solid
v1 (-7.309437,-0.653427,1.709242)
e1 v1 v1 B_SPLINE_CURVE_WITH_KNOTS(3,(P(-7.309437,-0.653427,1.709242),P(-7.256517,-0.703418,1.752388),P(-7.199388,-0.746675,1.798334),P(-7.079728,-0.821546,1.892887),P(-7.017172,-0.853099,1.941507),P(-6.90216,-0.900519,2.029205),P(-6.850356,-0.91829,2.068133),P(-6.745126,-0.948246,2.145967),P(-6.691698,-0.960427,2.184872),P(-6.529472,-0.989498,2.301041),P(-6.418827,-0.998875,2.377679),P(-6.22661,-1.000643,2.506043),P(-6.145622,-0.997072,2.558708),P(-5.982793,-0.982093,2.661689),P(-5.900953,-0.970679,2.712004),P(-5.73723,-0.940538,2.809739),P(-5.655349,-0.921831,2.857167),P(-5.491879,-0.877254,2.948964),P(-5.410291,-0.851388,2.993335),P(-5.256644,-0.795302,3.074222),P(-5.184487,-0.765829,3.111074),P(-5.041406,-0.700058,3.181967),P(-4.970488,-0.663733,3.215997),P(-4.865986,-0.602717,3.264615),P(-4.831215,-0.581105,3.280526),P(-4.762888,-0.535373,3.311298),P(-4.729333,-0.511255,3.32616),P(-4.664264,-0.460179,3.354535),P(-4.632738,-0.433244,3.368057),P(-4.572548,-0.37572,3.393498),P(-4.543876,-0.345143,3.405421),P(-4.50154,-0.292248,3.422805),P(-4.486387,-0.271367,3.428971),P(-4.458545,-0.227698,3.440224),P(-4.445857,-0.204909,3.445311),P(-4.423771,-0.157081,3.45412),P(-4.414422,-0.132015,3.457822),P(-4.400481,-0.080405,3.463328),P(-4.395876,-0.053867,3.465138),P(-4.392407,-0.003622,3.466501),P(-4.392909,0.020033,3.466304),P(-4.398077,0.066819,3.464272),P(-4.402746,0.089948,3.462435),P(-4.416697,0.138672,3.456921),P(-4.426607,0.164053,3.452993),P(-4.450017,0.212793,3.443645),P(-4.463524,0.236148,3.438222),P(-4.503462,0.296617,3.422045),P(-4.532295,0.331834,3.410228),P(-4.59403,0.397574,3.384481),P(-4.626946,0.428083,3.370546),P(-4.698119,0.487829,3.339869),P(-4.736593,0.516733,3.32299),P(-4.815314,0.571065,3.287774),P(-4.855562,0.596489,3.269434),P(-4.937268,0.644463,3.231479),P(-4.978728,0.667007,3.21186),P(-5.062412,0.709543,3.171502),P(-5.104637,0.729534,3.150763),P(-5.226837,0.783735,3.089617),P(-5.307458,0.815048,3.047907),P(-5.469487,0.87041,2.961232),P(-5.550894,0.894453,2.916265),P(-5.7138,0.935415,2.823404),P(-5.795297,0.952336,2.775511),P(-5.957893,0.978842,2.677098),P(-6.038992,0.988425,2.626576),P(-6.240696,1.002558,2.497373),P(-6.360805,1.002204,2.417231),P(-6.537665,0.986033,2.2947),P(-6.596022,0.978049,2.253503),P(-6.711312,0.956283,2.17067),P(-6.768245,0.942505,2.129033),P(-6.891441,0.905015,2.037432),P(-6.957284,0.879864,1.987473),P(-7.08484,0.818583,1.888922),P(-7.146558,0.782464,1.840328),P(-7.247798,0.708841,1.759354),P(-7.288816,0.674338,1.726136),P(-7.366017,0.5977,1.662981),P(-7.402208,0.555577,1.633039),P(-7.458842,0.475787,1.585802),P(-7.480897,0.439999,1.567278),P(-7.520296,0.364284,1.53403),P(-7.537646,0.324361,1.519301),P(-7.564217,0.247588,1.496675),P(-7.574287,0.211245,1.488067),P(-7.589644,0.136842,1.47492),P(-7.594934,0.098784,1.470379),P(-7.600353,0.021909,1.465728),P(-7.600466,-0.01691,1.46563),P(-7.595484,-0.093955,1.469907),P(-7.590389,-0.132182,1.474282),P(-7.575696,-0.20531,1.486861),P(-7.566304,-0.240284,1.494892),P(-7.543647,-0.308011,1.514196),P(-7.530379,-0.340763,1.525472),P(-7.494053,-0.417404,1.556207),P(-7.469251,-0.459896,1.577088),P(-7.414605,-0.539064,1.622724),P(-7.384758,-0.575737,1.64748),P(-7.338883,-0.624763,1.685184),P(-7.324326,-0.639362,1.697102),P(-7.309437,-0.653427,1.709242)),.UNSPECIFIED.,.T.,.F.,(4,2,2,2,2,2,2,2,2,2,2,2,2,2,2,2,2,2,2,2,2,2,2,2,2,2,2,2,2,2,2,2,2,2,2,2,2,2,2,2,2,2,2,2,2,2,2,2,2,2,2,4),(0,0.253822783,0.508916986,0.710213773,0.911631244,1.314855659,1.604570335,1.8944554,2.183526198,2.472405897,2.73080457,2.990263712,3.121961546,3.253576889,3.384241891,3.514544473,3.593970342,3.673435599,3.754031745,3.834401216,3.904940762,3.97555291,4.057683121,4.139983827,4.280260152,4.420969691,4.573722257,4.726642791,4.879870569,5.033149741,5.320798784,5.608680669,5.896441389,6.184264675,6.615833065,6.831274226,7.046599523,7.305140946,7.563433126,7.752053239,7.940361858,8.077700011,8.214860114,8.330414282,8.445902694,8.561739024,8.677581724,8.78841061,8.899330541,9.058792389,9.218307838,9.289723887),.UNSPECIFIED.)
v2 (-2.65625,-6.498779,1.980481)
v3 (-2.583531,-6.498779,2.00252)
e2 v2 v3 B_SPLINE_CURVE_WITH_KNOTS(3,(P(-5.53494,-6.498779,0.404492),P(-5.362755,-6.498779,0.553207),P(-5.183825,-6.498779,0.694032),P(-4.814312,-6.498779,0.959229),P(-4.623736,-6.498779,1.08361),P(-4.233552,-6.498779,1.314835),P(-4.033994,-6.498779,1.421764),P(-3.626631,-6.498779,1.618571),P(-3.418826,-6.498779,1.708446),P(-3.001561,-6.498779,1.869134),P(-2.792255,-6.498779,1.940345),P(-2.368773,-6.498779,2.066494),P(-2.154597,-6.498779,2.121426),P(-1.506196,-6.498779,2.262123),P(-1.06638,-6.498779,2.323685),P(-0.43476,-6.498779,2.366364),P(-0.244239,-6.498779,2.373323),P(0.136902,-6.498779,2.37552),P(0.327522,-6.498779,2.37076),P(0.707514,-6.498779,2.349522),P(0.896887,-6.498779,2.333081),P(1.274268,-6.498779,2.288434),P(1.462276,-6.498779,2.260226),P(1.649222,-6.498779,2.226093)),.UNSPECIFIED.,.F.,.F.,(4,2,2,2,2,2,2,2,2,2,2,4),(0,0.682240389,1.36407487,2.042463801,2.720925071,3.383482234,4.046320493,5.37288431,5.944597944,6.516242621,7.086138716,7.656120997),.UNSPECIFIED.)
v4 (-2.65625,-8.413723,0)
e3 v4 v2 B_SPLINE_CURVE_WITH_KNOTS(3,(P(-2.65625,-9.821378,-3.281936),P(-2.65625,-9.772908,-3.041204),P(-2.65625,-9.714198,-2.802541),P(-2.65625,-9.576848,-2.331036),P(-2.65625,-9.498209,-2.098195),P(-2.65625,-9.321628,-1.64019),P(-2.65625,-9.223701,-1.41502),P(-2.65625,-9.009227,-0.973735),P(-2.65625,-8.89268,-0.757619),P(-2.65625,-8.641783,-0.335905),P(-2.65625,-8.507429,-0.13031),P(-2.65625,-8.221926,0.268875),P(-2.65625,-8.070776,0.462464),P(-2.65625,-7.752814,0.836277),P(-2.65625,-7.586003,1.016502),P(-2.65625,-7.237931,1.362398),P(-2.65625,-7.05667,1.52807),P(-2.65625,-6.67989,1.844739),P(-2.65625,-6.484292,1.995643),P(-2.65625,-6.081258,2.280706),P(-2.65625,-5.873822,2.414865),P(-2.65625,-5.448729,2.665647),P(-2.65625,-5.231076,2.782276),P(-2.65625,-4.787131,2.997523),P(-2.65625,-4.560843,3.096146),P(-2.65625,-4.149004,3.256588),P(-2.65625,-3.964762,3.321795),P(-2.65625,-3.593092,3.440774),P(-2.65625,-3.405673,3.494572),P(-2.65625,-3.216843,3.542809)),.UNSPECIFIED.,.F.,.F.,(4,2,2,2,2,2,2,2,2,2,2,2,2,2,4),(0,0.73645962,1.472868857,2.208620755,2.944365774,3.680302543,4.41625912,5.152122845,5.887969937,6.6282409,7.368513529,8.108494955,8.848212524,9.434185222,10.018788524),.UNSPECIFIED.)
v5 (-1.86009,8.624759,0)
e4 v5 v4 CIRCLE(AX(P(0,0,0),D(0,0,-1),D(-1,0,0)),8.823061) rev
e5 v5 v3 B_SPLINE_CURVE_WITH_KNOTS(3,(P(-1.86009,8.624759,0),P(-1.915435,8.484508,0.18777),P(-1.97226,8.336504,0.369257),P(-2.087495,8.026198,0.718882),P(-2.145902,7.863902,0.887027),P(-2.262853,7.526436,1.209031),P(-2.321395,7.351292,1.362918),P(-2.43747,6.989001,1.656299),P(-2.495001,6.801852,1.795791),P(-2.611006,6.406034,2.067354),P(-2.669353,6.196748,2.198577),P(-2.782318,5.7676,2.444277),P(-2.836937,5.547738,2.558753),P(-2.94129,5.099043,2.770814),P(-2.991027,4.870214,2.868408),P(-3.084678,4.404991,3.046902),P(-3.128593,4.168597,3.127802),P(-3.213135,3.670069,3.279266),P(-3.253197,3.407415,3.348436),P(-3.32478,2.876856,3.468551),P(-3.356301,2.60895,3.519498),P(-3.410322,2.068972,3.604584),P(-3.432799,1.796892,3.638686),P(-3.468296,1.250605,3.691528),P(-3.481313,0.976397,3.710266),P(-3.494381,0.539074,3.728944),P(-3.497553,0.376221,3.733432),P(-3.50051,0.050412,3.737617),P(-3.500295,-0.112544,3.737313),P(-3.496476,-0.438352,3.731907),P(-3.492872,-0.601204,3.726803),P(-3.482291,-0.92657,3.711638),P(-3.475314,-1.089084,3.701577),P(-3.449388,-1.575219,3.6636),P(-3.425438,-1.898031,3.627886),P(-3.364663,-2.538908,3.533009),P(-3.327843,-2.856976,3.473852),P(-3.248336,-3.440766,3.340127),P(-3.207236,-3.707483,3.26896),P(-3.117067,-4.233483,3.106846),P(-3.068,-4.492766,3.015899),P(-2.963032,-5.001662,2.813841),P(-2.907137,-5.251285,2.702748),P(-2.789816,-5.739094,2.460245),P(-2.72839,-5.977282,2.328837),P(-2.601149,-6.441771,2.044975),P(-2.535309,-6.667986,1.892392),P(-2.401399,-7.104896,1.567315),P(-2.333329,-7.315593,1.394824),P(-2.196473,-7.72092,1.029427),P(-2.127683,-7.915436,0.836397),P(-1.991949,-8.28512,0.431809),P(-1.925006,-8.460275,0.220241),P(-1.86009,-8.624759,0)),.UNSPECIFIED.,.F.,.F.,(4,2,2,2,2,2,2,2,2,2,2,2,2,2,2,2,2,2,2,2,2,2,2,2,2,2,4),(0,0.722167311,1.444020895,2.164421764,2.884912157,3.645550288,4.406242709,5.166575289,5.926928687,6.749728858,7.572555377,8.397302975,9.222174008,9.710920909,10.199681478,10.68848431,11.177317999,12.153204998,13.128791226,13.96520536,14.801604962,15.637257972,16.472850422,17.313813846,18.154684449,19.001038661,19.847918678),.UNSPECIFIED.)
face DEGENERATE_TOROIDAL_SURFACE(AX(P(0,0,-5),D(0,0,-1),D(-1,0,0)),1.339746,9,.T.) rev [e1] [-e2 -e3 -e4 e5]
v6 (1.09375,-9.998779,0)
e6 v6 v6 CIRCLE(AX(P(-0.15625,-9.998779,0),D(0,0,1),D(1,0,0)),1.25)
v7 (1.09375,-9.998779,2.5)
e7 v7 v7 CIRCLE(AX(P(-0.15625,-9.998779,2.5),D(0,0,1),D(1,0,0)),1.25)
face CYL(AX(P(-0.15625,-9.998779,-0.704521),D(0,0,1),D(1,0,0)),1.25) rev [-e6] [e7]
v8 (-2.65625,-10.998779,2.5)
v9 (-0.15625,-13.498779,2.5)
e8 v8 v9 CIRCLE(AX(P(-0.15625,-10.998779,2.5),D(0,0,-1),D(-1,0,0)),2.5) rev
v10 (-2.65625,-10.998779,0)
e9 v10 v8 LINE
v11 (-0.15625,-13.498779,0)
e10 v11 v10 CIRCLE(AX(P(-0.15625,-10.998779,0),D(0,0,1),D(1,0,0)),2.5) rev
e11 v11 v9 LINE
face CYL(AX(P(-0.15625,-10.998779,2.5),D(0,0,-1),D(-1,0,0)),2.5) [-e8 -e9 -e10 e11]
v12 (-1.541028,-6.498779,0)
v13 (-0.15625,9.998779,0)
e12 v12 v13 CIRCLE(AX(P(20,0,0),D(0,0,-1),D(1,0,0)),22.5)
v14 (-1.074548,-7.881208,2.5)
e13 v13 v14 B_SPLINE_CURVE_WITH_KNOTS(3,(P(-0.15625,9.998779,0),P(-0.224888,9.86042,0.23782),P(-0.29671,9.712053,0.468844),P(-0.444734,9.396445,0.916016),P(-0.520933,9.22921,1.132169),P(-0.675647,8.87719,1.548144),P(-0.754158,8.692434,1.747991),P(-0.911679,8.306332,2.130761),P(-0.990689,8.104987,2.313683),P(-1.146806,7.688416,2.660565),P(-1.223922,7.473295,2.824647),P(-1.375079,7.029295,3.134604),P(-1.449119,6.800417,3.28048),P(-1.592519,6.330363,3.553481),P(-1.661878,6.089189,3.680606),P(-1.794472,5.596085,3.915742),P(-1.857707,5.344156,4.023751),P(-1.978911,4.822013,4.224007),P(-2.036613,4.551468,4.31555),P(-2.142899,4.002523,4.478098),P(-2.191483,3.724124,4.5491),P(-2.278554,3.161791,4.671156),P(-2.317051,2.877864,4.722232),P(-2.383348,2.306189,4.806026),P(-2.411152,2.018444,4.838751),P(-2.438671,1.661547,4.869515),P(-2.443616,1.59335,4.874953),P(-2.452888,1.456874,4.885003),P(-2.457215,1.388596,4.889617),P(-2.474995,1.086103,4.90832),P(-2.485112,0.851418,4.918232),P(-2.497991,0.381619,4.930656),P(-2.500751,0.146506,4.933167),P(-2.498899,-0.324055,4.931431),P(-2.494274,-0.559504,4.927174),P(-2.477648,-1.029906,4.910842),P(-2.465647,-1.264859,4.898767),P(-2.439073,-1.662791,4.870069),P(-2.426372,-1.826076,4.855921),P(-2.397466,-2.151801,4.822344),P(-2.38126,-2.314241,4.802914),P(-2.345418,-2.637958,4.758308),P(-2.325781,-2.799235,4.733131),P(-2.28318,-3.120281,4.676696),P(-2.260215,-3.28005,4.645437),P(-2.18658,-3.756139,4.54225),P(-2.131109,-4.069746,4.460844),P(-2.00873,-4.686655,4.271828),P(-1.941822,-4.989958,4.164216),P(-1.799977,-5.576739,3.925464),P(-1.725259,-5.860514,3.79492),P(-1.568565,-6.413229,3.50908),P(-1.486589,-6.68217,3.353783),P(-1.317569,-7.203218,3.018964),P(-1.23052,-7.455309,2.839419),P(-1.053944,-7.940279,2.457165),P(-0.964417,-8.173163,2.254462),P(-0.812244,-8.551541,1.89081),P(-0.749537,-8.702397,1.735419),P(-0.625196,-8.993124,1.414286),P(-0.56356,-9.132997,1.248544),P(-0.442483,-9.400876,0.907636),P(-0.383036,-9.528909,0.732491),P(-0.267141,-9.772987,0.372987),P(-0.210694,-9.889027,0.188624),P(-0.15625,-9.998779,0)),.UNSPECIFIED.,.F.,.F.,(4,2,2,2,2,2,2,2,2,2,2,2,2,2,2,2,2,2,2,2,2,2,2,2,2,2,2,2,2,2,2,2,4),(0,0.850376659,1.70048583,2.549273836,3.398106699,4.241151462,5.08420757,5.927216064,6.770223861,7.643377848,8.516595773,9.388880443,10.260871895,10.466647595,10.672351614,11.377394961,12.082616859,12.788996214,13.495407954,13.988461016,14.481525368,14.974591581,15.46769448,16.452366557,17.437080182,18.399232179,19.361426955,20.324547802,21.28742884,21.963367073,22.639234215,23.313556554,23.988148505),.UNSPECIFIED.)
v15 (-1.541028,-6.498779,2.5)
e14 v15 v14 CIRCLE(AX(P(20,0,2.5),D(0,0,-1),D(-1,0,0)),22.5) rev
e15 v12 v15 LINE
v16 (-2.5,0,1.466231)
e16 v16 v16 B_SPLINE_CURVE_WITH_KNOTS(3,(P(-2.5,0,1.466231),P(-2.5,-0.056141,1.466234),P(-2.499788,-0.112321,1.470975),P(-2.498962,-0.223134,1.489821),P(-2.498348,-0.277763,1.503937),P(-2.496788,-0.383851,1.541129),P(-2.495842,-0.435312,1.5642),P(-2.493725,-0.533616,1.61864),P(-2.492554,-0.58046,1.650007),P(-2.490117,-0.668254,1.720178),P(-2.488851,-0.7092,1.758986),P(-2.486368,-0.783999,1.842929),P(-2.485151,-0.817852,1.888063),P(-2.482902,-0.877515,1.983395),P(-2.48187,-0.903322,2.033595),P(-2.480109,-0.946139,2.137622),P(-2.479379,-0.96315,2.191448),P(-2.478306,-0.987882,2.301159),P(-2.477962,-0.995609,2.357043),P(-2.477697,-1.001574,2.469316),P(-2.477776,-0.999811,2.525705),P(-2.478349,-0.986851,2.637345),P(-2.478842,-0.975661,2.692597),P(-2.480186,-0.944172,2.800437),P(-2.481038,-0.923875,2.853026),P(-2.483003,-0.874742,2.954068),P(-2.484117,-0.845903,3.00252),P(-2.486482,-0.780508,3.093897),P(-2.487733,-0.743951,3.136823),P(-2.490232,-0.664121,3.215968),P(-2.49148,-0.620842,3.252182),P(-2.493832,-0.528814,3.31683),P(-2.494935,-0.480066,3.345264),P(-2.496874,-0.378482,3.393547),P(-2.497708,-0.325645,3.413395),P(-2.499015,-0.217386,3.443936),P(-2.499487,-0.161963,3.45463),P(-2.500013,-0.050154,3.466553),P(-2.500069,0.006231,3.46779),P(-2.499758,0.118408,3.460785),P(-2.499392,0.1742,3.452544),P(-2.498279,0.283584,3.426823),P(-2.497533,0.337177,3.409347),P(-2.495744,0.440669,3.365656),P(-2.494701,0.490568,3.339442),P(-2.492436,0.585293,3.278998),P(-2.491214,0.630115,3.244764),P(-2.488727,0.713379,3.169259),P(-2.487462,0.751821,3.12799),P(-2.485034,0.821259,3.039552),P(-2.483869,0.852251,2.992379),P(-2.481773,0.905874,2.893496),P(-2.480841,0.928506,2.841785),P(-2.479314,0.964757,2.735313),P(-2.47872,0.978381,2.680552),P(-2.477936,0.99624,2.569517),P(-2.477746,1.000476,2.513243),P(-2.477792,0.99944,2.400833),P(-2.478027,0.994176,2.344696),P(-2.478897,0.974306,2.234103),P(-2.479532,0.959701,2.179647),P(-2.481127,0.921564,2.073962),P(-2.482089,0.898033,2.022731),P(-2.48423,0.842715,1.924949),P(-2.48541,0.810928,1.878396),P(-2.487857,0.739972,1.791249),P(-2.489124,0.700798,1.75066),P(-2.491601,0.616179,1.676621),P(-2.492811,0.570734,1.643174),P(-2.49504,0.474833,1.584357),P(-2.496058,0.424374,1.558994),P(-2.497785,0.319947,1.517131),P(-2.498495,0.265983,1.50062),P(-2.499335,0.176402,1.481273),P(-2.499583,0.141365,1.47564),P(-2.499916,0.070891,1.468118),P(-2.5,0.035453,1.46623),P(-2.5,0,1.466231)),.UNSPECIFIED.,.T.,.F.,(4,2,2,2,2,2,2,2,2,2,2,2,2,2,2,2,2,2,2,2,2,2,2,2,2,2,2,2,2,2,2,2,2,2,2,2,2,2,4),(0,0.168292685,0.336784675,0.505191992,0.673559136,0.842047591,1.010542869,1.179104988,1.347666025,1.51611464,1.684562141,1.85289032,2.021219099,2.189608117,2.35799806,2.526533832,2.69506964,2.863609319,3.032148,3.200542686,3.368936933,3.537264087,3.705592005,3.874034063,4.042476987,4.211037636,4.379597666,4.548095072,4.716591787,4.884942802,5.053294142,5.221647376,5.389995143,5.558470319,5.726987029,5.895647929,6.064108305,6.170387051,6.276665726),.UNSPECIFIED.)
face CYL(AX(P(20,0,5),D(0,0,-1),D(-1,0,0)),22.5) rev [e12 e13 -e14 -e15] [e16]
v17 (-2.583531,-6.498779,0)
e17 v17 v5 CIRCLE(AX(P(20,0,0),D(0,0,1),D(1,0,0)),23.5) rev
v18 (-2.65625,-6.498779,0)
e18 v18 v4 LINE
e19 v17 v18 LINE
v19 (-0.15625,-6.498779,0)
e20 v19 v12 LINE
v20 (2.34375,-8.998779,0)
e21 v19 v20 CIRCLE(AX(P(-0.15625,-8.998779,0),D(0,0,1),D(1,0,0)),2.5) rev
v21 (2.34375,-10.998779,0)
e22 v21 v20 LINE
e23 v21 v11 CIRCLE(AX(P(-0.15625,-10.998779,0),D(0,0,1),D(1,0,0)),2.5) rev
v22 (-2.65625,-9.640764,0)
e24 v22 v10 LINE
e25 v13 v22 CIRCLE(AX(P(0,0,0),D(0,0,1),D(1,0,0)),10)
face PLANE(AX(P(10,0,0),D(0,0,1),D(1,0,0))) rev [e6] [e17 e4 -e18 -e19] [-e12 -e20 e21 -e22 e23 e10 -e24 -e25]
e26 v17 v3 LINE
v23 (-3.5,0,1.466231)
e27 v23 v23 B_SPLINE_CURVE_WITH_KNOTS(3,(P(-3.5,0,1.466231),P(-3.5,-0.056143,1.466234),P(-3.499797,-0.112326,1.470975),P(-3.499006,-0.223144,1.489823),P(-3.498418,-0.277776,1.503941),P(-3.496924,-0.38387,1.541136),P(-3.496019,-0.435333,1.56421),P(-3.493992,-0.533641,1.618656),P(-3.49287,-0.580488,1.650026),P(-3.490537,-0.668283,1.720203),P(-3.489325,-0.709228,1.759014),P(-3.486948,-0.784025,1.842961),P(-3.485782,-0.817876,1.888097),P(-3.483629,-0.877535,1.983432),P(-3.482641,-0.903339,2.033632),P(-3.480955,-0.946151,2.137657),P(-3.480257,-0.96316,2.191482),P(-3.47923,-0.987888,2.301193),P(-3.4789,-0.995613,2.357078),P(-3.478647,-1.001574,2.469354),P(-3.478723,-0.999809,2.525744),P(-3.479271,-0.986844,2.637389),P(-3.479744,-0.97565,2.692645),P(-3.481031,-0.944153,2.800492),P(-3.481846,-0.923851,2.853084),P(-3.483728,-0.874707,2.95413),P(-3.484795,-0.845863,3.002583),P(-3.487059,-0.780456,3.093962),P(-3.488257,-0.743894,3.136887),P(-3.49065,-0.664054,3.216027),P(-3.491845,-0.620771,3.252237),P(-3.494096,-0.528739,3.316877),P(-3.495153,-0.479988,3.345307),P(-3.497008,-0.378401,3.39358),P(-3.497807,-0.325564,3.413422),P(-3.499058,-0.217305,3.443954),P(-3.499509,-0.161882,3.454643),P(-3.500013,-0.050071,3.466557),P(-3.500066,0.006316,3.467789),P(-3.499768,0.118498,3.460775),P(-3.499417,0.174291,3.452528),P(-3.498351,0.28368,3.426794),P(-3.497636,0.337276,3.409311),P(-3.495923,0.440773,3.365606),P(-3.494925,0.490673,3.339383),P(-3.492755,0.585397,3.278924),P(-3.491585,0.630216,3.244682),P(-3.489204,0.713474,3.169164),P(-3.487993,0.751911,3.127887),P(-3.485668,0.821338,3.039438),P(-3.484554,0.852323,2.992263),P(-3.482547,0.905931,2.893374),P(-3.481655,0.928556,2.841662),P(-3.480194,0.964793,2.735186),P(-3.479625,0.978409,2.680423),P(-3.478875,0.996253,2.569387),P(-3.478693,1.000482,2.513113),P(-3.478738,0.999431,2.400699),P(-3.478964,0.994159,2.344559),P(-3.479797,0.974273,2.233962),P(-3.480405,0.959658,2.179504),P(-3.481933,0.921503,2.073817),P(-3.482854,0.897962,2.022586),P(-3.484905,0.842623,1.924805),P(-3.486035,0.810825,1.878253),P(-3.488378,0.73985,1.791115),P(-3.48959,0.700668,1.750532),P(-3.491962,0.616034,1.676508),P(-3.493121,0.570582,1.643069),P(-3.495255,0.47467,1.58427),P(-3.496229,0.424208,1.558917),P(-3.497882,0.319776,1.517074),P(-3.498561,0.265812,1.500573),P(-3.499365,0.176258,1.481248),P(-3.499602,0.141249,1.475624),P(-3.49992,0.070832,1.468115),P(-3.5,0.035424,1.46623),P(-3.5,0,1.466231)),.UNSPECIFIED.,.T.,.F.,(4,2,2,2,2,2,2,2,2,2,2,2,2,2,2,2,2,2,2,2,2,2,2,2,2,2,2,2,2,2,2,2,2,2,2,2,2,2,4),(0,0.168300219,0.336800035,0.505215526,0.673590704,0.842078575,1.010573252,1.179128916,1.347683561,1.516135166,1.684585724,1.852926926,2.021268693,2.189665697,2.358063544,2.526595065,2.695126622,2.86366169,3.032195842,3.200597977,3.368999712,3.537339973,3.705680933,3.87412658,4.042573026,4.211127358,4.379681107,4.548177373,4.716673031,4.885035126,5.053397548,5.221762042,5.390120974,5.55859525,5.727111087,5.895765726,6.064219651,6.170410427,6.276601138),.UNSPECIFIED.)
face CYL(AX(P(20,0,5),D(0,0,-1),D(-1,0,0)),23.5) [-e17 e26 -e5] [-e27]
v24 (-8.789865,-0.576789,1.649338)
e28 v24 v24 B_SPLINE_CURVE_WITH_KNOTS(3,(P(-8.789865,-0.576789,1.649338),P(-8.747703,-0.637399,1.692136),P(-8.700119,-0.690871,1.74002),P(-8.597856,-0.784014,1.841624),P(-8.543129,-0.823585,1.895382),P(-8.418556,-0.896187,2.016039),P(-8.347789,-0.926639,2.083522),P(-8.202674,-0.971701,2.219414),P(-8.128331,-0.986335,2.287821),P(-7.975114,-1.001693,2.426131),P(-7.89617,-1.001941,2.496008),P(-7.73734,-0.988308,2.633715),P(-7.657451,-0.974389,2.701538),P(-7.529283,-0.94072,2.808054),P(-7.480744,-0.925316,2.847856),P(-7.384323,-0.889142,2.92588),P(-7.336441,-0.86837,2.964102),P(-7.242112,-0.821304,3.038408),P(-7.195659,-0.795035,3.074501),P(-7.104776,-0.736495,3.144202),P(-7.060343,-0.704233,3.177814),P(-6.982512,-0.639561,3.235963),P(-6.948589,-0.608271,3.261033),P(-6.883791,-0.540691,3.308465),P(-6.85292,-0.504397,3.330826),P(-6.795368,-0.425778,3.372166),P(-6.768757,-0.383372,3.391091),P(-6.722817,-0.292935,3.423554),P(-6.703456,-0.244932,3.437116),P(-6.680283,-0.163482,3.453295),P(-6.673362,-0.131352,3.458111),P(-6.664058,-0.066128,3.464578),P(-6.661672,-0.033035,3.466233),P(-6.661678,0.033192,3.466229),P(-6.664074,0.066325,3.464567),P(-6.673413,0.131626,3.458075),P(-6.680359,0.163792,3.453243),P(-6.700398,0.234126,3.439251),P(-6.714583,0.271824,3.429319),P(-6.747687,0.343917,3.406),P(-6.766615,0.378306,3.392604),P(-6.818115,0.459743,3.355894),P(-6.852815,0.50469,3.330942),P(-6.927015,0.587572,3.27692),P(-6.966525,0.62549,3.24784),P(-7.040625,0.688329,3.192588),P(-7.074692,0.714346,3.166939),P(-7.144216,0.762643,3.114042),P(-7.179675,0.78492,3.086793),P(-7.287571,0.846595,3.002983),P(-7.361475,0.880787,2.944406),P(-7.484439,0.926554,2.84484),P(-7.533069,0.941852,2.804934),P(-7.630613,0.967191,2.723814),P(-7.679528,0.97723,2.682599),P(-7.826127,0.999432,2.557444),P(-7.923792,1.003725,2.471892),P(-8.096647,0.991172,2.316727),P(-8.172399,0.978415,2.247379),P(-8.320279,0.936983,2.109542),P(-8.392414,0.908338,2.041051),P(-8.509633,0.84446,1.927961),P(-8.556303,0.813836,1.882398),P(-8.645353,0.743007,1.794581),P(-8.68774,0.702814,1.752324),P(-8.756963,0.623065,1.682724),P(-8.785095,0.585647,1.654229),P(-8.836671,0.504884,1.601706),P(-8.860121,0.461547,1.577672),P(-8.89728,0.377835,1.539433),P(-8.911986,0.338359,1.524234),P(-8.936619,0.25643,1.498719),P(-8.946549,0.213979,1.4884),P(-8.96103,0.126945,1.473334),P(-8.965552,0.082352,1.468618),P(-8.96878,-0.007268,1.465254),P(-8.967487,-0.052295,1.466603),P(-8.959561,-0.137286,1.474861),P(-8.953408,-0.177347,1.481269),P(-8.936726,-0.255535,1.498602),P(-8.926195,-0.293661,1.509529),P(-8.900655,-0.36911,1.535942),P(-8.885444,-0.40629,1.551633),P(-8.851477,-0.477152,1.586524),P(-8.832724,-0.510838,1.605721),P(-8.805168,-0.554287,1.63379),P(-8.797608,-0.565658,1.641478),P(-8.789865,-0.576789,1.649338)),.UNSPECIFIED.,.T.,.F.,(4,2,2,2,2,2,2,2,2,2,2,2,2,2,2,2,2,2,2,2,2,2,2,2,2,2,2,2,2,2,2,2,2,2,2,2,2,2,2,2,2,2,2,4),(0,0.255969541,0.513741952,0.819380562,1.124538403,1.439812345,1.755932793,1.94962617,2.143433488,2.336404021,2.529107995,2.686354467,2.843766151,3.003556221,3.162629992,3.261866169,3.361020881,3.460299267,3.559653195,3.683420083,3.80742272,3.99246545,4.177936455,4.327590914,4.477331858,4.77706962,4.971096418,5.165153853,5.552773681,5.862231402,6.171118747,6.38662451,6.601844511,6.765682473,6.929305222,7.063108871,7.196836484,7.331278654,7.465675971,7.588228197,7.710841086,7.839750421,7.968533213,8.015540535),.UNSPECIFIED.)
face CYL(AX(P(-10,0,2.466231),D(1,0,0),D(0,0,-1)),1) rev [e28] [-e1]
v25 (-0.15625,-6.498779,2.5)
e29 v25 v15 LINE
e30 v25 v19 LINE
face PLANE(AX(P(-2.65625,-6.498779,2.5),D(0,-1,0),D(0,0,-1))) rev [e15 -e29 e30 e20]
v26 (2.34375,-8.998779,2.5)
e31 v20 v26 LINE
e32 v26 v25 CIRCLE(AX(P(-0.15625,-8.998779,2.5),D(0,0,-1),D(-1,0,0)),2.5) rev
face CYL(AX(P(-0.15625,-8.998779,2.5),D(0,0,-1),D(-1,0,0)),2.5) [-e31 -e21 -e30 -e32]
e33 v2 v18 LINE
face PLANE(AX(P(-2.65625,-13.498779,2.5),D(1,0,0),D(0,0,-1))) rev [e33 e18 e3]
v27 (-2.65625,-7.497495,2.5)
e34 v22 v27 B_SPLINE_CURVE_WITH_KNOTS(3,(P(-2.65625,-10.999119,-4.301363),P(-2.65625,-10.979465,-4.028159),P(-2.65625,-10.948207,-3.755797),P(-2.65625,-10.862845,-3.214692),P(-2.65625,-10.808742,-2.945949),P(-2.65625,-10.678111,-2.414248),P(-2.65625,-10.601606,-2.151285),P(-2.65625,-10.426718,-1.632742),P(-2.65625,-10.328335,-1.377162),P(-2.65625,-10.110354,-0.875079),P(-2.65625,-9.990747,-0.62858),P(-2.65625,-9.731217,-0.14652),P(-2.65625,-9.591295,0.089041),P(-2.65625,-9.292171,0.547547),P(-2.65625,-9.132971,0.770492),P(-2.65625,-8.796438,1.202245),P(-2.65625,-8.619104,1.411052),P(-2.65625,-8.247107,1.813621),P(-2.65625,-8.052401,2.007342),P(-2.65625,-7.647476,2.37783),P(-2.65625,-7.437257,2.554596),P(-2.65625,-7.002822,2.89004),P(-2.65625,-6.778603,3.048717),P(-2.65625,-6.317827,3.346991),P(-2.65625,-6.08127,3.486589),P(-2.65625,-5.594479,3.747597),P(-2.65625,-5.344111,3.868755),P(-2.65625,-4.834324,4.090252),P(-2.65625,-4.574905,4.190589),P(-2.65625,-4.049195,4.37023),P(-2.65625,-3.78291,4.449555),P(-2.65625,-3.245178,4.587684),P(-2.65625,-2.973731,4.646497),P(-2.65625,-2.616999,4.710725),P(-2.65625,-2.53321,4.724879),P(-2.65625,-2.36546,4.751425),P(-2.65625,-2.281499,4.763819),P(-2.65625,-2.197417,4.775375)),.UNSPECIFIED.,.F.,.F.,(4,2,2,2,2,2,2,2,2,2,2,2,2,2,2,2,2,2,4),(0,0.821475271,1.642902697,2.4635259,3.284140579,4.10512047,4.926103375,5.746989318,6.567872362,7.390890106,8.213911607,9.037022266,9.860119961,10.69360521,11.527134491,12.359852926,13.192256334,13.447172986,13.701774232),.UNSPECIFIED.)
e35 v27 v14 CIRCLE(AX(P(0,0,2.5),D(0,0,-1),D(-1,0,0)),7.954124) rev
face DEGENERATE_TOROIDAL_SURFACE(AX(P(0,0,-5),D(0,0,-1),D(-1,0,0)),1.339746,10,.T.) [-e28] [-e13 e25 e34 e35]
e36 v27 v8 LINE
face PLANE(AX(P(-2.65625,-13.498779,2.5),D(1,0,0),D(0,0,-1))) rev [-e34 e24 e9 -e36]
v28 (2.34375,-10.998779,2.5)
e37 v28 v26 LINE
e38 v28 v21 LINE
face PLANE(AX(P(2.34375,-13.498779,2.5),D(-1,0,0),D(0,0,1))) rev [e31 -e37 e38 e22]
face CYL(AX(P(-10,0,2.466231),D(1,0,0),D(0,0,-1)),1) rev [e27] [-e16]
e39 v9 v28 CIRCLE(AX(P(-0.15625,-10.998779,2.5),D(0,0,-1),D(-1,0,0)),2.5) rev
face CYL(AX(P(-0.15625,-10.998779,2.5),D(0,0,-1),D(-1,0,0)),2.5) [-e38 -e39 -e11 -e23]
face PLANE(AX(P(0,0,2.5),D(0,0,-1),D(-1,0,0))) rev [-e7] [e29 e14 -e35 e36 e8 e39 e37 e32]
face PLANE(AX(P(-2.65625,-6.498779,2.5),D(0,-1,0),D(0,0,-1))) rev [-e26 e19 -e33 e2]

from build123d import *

# Parameters (mm, degrees)
BOSS_EXTRUDE1_DEPTH = 5
FILLET1_R           = 10
SHELL1_T            = -1
SKETCH4_R           = 1
CUT_EXTRUDE1_DEPTH  = 15.976807967
SKETCH5_W           = 5
SKETCH5_H           = 7
BOSS_EXTRUDE2_DEPTH = 2.5
SKETCH7_R           = 1.25
CUT_EXTRUDE3_DEPTH  = 17.98431764
FILLET4_R           = 2.5


# Some blends are built 0.0001 mm under size
with BuildPart() as part:
    # Sketch1 → Boss-Extrude1 (new body)
    with BuildSketch(Plane.XY):
        with BuildLine():
            ThreePointArc((-0.15625, 9.998779222), (-10, 0), (-0.15625, -9.998779222))
            ThreePointArc((-0.15625, -9.998779222), (-2.5, 0), (-0.15625, 9.998779222))
        make_face()
    extrude(amount=BOSS_EXTRUDE1_DEPTH)

    # Fillet1
    # the kernel refuses this fillet: 10 mm, written as the material it takes off along each edge
    with BuildSketch(Plane(origin=(0, 0, 5), x_dir=(0.9999950652018581, 0.003141587485880102, 0), z_dir=(0.003141587485880102, -0.9999950652018581, 0))) as fillet1_piece_1:
        with BuildLine():
            CenterArc((1.339745962, -10), FILLET1_R, 30, 60)
            Line((1.339745962, 0), (1.339745962, 0.2))
            Line((1.339745962, 0.2), (10, 0.2))
            Line((10, 0.2), (10.2, 0))
            ThreePointArc((10.2, 0), (10.2, -2.5), (10.173205081, -4.9))
            Line((10.173205081, -4.9), (10, -5))
        make_face()
    revolve(axis=Axis((0, 0, 5), (0, 0, 1)), revolution_arc=359.64, mode=Mode.SUBTRACT)

    # Shell1
    shell1_openings = [part.faces().sort_by_distance(p)[0] for p in [
        (-5.162614347, 0, 0),
    ]]
    offset(amount=SHELL1_T, openings=shell1_openings, kind=Kind.INTERSECTION)

    # Sketch4 → Cut-Extrude1 (cut, through all)
    with BuildSketch(Plane(origin=(0, 0, 0), x_dir=(0, 0, -1), z_dir=(1, 0, 0))):
        with Locations(Location((-2.466231233, 0, 0), (0, 0, 324.775001353))):
            Circle(SKETCH4_R)
    extrude(amount=-CUT_EXTRUDE1_DEPTH, mode=Mode.SUBTRACT)

    # Sketch5 → Boss-Extrude2 (add)
    with BuildSketch(Plane.XY):
        with Locations((-0.15625, -9.998779222)):
            Rectangle(SKETCH5_W, SKETCH5_H)
    extrude(amount=BOSS_EXTRUDE2_DEPTH)

    # Sketch7 → Cut-Extrude3 (cut, through all)
    with BuildSketch(Plane.XY.offset(2.5)):
        with Locations((-0.15625, -9.998779222)):
            Circle(SKETCH7_R)
    extrude(amount=-CUT_EXTRUDE3_DEPTH, mode=Mode.SUBTRACT)

    # Fillet4
    fillet4_edges = [part.edges().sort_by_distance(p)[0] for p in [
        (-2.65625, -13.498779222, 1.25),
        (2.34375, -13.498779222, 1.25),
        (2.34375, -6.498779222, 1.25),
    ]]
    fillet(fillet4_edges, radius=FILLET4_R - 0.0001)  # a hair under: the kernel refuses the full size


solid = part.part
